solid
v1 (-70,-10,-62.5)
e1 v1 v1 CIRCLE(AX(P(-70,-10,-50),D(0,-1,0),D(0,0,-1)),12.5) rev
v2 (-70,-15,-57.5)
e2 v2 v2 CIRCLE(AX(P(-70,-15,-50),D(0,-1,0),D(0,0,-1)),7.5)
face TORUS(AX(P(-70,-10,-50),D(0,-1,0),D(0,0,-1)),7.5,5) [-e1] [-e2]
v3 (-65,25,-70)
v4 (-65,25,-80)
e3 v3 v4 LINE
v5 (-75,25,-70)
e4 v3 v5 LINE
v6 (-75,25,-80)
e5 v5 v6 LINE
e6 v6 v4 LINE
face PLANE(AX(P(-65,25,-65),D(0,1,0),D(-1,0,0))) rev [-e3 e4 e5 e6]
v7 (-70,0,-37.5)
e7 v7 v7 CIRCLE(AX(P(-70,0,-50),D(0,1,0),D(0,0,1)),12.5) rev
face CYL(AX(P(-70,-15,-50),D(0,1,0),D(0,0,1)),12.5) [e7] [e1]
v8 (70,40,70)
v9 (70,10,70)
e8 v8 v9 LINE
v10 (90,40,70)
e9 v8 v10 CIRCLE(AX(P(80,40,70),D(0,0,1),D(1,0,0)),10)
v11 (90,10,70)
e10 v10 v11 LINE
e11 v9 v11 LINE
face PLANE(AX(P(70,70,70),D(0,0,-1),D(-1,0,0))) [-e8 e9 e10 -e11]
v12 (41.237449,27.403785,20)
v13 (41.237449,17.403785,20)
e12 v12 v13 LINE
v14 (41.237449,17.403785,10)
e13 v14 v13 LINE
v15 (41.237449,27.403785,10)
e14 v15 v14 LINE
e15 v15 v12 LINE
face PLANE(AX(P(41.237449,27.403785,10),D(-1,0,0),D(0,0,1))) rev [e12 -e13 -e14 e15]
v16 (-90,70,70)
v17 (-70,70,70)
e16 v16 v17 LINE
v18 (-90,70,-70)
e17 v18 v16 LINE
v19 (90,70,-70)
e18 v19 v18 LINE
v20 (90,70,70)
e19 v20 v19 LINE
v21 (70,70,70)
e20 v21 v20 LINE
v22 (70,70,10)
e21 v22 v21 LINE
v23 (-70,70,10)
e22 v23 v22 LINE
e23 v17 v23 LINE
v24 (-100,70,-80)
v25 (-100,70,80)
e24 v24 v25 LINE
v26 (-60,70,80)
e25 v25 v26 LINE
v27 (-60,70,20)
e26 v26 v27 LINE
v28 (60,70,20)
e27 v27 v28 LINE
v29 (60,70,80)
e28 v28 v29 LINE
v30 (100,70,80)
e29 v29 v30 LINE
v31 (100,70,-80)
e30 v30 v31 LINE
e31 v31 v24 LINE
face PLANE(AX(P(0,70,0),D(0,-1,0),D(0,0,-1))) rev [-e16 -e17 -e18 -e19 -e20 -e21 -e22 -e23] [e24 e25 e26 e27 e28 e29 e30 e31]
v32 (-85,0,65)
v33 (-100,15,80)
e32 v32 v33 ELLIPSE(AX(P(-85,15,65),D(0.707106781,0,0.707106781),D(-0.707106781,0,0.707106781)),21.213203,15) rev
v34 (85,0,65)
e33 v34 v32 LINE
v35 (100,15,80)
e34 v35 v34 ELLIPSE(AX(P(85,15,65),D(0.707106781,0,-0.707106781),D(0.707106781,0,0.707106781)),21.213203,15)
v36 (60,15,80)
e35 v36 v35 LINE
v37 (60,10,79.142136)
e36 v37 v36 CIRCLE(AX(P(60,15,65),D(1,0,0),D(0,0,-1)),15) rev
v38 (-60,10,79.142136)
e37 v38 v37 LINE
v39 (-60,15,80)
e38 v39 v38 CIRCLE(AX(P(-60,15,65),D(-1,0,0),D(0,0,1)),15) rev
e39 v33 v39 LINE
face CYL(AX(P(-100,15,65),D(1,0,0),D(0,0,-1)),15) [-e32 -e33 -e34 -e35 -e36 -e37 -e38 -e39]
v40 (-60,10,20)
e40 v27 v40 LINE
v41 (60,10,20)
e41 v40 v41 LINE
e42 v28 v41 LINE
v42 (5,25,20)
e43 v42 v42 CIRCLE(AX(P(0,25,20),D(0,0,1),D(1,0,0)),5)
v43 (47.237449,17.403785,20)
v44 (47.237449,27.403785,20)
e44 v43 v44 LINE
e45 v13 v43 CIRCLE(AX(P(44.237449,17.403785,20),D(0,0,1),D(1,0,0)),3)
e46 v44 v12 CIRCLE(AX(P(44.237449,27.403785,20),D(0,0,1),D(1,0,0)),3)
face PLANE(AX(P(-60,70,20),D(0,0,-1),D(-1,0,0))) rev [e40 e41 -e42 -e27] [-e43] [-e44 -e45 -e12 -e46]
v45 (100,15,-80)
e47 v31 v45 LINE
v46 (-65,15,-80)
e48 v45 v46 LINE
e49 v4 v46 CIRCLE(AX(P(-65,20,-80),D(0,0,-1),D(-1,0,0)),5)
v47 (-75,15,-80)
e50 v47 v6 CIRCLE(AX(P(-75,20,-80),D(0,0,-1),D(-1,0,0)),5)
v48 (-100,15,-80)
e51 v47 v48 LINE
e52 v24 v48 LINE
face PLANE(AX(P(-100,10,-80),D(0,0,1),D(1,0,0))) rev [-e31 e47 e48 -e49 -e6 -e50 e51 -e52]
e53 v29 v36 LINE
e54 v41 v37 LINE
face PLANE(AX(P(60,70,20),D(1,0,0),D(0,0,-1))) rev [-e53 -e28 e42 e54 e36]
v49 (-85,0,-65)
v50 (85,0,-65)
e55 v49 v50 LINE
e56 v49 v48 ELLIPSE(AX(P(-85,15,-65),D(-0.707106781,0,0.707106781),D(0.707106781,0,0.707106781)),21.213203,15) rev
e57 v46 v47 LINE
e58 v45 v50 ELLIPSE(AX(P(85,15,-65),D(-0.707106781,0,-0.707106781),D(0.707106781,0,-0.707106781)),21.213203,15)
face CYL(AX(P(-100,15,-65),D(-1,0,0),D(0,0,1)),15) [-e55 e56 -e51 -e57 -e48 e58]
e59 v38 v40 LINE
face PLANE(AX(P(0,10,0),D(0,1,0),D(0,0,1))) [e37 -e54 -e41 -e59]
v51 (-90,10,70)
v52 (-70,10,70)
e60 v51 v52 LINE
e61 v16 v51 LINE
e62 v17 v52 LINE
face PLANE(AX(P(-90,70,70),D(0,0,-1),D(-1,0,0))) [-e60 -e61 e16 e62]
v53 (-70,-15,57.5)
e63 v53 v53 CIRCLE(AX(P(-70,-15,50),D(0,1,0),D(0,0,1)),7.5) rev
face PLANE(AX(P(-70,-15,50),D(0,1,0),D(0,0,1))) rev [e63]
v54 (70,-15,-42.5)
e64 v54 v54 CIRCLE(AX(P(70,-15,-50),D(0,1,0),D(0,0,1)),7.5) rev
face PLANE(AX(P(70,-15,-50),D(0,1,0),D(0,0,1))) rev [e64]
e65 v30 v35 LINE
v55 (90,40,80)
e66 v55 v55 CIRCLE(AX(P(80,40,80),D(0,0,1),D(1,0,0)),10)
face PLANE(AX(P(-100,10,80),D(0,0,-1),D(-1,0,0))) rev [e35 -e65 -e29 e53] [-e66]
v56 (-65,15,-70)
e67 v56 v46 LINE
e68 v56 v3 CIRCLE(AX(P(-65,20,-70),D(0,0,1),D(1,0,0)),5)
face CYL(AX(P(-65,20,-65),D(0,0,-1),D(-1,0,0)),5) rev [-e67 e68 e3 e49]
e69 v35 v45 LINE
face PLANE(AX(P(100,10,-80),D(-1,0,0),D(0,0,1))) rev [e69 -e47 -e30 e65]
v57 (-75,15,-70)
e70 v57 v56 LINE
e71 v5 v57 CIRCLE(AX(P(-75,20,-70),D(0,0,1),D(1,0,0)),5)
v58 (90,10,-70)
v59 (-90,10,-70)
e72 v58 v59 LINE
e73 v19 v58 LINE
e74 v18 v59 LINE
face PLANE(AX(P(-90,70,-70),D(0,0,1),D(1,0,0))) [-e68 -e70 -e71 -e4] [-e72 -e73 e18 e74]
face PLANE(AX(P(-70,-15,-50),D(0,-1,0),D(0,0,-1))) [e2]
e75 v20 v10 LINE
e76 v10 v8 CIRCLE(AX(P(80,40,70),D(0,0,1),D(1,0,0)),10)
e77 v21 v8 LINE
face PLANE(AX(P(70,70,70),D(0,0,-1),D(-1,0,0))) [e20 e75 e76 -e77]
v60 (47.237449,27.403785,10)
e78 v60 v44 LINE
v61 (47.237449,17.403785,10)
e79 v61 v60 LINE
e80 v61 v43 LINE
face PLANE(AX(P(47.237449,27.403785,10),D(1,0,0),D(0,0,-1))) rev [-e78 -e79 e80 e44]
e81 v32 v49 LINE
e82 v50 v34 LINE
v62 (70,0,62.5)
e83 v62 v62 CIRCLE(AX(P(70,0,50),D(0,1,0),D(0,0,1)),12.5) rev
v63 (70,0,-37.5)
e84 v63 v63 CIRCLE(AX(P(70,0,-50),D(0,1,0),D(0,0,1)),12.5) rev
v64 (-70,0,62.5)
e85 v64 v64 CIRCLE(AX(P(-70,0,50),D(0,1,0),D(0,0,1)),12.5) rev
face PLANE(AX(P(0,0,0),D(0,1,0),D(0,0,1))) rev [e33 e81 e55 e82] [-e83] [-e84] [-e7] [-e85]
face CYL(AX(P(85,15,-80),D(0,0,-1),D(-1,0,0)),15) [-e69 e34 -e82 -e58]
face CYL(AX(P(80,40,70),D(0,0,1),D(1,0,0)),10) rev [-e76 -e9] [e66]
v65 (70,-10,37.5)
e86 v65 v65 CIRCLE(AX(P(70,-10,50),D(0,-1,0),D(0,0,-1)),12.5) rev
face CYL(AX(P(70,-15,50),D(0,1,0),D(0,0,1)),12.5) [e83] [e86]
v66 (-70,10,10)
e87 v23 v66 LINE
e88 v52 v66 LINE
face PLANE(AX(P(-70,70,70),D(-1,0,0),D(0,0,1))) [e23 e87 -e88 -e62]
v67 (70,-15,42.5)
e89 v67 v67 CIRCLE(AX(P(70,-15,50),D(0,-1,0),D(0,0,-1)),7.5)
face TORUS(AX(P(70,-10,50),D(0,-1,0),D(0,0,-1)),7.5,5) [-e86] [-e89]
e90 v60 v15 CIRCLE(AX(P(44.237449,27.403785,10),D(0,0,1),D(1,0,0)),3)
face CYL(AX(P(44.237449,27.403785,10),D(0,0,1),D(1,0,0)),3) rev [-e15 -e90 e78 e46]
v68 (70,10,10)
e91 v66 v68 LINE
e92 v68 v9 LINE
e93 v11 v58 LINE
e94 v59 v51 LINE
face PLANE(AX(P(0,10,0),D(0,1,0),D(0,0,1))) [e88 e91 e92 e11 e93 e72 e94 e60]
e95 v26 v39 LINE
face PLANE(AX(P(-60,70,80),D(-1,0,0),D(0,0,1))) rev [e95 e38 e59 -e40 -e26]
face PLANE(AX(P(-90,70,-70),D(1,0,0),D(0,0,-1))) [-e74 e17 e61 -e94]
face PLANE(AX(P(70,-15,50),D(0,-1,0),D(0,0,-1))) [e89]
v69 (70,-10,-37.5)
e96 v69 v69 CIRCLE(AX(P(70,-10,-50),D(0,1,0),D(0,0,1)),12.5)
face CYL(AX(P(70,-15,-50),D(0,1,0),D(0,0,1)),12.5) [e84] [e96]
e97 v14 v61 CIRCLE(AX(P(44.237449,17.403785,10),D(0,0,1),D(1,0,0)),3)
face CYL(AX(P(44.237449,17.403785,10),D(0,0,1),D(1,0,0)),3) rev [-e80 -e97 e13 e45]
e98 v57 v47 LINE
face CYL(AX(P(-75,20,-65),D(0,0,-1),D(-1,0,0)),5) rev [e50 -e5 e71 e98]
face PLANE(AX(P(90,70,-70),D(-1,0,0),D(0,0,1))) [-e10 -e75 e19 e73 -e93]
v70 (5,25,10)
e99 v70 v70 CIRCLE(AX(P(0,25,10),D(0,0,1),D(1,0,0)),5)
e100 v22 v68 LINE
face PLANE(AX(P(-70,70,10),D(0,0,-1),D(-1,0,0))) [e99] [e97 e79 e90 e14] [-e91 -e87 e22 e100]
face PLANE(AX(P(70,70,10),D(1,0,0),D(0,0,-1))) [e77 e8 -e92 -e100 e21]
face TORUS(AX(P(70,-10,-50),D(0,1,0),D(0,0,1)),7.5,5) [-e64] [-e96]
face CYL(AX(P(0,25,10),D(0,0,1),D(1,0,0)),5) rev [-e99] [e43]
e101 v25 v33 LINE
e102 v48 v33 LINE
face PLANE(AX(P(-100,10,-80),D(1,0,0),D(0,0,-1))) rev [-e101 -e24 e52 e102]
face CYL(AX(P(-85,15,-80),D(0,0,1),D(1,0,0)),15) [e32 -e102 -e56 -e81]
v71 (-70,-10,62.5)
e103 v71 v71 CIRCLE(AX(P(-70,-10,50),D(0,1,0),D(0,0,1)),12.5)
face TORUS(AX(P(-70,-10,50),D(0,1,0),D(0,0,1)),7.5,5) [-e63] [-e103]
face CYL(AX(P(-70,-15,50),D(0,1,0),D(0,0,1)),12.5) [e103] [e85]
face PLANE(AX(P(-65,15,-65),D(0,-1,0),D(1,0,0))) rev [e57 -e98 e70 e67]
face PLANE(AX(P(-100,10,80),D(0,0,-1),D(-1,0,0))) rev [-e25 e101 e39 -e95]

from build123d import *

# Parameters (mm, degrees)
SKETCH2_W           = 200
SKETCH2_H           = 160
BOSS_EXTRUDE1_DEPTH = 10
BOSS_EXTRUDE2_DEPTH = 60
SKETCH8_R           = 12.5
BOSS_EXTRUDE6_DEPTH = 15
FILLET2_R           = 5
CUT_EXTRUDE4_DEPTH  = 15
SKETCH10_R          = 10
CUT_EXTRUDE5_DEPTH  = 10
SKETCH7_R           = 5
CUT_EXTRUDE6_DEPTH  = 10
CUT_EXTRUDE7_DEPTH  = 10
FILLET5_R           = 15


with BuildPart() as part:
    # Sketch2 → Boss-Extrude1 (new body)
    with BuildSketch(Plane(origin=(0, 0, 0), x_dir=(1, 0, 0), z_dir=(0, 1, 0))):
        Rectangle(SKETCH2_W, SKETCH2_H)
    extrude(amount=BOSS_EXTRUDE1_DEPTH)

    # Sketch3 → Boss-Extrude2 (add)
    with BuildSketch(Plane(origin=(0, 10, 0), x_dir=(1, 0, 0), z_dir=(0, 1, 0))):
        Polygon((-100, 80), (100, 80), (100, -80), (60, -80), (60, -20), (-60, -20), (-60, -80), (-100, -80), align=None)
        Polygon((90, 70), (90, -70), (70, -70), (70, -10), (-70, -10), (-70, -70), (-90, -70), (-90, 70), align=None, mode=Mode.SUBTRACT)
    extrude(amount=BOSS_EXTRUDE2_DEPTH)

    # Sketch8 → Boss-Extrude6 (add)
    with BuildSketch(Plane.XZ):
        with Locations(Location((70, 50, 0), (0, 0, 90))):
            Circle(SKETCH8_R)
        with Locations(Location((-70, 50, 0), (0, 0, 90))):
            Circle(SKETCH8_R)
        with Locations(Location((70, -50, 0), (0, 0, 90))):
            Circle(SKETCH8_R)
        with Locations(Location((-70, -50, 0), (0, 0, 90))):
            Circle(SKETCH8_R)
    extrude(amount=BOSS_EXTRUDE6_DEPTH)

    # Fillet2
    fillet2_edges = [part.edges().sort_by_distance(p)[0] for p in [
        (70, -15, 37.5),
        (-70, -15, 37.5),
        (70, -15, -62.5),
        (-70, -15, -62.5),
    ]]
    fillet(fillet2_edges, radius=FILLET2_R)

    # Sketch9 → Cut-Extrude4 (cut)
    with BuildSketch(Plane(origin=(0, 0, -80), x_dir=(-1, 0, 0), z_dir=(0, 0, -1))):
        with BuildLine():
            Line((65, 25), (75, 25))
            ThreePointArc((75, 25), (80, 20), (75, 15))
            Line((75, 15), (65, 15))
            ThreePointArc((65, 15), (60, 20), (65, 25))
        make_face()
    extrude(amount=-CUT_EXTRUDE4_DEPTH, mode=Mode.SUBTRACT)

    # Sketch10 → Cut-Extrude5 (cut)
    with BuildSketch(Plane.XY.offset(80)):
        with Locations((80, 40)):
            Circle(SKETCH10_R)
    extrude(amount=-CUT_EXTRUDE5_DEPTH, mode=Mode.SUBTRACT)

    # Sketch7 → Cut-Extrude6 (cut)
    with BuildSketch(Plane.XY.offset(20)):
        with Locations((0, 25)):
            Circle(SKETCH7_R)
    extrude(amount=-CUT_EXTRUDE6_DEPTH, mode=Mode.SUBTRACT)

    # Sketch11 → Cut-Extrude7 (cut)
    with BuildSketch(Plane.XY.offset(20)):
        with BuildLine():
            Line((47.237449464, 27.403784995), (47.237449464, 17.403784995))
            ThreePointArc((47.237449464, 17.403784995), (44.237449464, 14.403784995), (41.237449464, 17.403784995))
            Line((41.237449464, 17.403784995), (41.237449464, 27.403784995))
            ThreePointArc((41.237449464, 27.403784995), (44.237449464, 30.403784995), (47.237449464, 27.403784995))
        make_face()
    extrude(amount=-CUT_EXTRUDE7_DEPTH, mode=Mode.SUBTRACT)

    # Fillet5
    # the kernel refuses this fillet: 15 mm, written as the material it takes off along each edge
    with BuildSketch(Plane(origin=(-137.5, 0, -80), x_dir=(0, 0, 1), z_dir=(1, 0, 0)), Plane(origin=(137.5, 0, 80), x_dir=(0, 0, -1), z_dir=(-1, 0, 0))) as fillet5_piece_1:
        with BuildLine():
            CenterArc((FILLET5_R, -FILLET5_R), FILLET5_R, 90, 90)
            Line((0, -FILLET5_R), (0, 0))
            Line((0, 0), (FILLET5_R, 0))
        make_face()
    extrude(amount=275, mode=Mode.SUBTRACT)
    with BuildSketch(Plane(origin=(100, 0, -117.5), x_dir=(-1, 0, 0), z_dir=(0, 0, 1)), Plane(origin=(-100, 0, 117.5), x_dir=(1, 0, 0), z_dir=(0, 0, -1))) as fillet5_piece_2:
        with BuildLine():
            CenterArc((FILLET5_R, -FILLET5_R), FILLET5_R, 90, 90)
            Line((0, -FILLET5_R), (0, 0))
            Line((0, 0), (FILLET5_R, 0))
        make_face()
    extrude(amount=235, mode=Mode.SUBTRACT)


solid = part.part
